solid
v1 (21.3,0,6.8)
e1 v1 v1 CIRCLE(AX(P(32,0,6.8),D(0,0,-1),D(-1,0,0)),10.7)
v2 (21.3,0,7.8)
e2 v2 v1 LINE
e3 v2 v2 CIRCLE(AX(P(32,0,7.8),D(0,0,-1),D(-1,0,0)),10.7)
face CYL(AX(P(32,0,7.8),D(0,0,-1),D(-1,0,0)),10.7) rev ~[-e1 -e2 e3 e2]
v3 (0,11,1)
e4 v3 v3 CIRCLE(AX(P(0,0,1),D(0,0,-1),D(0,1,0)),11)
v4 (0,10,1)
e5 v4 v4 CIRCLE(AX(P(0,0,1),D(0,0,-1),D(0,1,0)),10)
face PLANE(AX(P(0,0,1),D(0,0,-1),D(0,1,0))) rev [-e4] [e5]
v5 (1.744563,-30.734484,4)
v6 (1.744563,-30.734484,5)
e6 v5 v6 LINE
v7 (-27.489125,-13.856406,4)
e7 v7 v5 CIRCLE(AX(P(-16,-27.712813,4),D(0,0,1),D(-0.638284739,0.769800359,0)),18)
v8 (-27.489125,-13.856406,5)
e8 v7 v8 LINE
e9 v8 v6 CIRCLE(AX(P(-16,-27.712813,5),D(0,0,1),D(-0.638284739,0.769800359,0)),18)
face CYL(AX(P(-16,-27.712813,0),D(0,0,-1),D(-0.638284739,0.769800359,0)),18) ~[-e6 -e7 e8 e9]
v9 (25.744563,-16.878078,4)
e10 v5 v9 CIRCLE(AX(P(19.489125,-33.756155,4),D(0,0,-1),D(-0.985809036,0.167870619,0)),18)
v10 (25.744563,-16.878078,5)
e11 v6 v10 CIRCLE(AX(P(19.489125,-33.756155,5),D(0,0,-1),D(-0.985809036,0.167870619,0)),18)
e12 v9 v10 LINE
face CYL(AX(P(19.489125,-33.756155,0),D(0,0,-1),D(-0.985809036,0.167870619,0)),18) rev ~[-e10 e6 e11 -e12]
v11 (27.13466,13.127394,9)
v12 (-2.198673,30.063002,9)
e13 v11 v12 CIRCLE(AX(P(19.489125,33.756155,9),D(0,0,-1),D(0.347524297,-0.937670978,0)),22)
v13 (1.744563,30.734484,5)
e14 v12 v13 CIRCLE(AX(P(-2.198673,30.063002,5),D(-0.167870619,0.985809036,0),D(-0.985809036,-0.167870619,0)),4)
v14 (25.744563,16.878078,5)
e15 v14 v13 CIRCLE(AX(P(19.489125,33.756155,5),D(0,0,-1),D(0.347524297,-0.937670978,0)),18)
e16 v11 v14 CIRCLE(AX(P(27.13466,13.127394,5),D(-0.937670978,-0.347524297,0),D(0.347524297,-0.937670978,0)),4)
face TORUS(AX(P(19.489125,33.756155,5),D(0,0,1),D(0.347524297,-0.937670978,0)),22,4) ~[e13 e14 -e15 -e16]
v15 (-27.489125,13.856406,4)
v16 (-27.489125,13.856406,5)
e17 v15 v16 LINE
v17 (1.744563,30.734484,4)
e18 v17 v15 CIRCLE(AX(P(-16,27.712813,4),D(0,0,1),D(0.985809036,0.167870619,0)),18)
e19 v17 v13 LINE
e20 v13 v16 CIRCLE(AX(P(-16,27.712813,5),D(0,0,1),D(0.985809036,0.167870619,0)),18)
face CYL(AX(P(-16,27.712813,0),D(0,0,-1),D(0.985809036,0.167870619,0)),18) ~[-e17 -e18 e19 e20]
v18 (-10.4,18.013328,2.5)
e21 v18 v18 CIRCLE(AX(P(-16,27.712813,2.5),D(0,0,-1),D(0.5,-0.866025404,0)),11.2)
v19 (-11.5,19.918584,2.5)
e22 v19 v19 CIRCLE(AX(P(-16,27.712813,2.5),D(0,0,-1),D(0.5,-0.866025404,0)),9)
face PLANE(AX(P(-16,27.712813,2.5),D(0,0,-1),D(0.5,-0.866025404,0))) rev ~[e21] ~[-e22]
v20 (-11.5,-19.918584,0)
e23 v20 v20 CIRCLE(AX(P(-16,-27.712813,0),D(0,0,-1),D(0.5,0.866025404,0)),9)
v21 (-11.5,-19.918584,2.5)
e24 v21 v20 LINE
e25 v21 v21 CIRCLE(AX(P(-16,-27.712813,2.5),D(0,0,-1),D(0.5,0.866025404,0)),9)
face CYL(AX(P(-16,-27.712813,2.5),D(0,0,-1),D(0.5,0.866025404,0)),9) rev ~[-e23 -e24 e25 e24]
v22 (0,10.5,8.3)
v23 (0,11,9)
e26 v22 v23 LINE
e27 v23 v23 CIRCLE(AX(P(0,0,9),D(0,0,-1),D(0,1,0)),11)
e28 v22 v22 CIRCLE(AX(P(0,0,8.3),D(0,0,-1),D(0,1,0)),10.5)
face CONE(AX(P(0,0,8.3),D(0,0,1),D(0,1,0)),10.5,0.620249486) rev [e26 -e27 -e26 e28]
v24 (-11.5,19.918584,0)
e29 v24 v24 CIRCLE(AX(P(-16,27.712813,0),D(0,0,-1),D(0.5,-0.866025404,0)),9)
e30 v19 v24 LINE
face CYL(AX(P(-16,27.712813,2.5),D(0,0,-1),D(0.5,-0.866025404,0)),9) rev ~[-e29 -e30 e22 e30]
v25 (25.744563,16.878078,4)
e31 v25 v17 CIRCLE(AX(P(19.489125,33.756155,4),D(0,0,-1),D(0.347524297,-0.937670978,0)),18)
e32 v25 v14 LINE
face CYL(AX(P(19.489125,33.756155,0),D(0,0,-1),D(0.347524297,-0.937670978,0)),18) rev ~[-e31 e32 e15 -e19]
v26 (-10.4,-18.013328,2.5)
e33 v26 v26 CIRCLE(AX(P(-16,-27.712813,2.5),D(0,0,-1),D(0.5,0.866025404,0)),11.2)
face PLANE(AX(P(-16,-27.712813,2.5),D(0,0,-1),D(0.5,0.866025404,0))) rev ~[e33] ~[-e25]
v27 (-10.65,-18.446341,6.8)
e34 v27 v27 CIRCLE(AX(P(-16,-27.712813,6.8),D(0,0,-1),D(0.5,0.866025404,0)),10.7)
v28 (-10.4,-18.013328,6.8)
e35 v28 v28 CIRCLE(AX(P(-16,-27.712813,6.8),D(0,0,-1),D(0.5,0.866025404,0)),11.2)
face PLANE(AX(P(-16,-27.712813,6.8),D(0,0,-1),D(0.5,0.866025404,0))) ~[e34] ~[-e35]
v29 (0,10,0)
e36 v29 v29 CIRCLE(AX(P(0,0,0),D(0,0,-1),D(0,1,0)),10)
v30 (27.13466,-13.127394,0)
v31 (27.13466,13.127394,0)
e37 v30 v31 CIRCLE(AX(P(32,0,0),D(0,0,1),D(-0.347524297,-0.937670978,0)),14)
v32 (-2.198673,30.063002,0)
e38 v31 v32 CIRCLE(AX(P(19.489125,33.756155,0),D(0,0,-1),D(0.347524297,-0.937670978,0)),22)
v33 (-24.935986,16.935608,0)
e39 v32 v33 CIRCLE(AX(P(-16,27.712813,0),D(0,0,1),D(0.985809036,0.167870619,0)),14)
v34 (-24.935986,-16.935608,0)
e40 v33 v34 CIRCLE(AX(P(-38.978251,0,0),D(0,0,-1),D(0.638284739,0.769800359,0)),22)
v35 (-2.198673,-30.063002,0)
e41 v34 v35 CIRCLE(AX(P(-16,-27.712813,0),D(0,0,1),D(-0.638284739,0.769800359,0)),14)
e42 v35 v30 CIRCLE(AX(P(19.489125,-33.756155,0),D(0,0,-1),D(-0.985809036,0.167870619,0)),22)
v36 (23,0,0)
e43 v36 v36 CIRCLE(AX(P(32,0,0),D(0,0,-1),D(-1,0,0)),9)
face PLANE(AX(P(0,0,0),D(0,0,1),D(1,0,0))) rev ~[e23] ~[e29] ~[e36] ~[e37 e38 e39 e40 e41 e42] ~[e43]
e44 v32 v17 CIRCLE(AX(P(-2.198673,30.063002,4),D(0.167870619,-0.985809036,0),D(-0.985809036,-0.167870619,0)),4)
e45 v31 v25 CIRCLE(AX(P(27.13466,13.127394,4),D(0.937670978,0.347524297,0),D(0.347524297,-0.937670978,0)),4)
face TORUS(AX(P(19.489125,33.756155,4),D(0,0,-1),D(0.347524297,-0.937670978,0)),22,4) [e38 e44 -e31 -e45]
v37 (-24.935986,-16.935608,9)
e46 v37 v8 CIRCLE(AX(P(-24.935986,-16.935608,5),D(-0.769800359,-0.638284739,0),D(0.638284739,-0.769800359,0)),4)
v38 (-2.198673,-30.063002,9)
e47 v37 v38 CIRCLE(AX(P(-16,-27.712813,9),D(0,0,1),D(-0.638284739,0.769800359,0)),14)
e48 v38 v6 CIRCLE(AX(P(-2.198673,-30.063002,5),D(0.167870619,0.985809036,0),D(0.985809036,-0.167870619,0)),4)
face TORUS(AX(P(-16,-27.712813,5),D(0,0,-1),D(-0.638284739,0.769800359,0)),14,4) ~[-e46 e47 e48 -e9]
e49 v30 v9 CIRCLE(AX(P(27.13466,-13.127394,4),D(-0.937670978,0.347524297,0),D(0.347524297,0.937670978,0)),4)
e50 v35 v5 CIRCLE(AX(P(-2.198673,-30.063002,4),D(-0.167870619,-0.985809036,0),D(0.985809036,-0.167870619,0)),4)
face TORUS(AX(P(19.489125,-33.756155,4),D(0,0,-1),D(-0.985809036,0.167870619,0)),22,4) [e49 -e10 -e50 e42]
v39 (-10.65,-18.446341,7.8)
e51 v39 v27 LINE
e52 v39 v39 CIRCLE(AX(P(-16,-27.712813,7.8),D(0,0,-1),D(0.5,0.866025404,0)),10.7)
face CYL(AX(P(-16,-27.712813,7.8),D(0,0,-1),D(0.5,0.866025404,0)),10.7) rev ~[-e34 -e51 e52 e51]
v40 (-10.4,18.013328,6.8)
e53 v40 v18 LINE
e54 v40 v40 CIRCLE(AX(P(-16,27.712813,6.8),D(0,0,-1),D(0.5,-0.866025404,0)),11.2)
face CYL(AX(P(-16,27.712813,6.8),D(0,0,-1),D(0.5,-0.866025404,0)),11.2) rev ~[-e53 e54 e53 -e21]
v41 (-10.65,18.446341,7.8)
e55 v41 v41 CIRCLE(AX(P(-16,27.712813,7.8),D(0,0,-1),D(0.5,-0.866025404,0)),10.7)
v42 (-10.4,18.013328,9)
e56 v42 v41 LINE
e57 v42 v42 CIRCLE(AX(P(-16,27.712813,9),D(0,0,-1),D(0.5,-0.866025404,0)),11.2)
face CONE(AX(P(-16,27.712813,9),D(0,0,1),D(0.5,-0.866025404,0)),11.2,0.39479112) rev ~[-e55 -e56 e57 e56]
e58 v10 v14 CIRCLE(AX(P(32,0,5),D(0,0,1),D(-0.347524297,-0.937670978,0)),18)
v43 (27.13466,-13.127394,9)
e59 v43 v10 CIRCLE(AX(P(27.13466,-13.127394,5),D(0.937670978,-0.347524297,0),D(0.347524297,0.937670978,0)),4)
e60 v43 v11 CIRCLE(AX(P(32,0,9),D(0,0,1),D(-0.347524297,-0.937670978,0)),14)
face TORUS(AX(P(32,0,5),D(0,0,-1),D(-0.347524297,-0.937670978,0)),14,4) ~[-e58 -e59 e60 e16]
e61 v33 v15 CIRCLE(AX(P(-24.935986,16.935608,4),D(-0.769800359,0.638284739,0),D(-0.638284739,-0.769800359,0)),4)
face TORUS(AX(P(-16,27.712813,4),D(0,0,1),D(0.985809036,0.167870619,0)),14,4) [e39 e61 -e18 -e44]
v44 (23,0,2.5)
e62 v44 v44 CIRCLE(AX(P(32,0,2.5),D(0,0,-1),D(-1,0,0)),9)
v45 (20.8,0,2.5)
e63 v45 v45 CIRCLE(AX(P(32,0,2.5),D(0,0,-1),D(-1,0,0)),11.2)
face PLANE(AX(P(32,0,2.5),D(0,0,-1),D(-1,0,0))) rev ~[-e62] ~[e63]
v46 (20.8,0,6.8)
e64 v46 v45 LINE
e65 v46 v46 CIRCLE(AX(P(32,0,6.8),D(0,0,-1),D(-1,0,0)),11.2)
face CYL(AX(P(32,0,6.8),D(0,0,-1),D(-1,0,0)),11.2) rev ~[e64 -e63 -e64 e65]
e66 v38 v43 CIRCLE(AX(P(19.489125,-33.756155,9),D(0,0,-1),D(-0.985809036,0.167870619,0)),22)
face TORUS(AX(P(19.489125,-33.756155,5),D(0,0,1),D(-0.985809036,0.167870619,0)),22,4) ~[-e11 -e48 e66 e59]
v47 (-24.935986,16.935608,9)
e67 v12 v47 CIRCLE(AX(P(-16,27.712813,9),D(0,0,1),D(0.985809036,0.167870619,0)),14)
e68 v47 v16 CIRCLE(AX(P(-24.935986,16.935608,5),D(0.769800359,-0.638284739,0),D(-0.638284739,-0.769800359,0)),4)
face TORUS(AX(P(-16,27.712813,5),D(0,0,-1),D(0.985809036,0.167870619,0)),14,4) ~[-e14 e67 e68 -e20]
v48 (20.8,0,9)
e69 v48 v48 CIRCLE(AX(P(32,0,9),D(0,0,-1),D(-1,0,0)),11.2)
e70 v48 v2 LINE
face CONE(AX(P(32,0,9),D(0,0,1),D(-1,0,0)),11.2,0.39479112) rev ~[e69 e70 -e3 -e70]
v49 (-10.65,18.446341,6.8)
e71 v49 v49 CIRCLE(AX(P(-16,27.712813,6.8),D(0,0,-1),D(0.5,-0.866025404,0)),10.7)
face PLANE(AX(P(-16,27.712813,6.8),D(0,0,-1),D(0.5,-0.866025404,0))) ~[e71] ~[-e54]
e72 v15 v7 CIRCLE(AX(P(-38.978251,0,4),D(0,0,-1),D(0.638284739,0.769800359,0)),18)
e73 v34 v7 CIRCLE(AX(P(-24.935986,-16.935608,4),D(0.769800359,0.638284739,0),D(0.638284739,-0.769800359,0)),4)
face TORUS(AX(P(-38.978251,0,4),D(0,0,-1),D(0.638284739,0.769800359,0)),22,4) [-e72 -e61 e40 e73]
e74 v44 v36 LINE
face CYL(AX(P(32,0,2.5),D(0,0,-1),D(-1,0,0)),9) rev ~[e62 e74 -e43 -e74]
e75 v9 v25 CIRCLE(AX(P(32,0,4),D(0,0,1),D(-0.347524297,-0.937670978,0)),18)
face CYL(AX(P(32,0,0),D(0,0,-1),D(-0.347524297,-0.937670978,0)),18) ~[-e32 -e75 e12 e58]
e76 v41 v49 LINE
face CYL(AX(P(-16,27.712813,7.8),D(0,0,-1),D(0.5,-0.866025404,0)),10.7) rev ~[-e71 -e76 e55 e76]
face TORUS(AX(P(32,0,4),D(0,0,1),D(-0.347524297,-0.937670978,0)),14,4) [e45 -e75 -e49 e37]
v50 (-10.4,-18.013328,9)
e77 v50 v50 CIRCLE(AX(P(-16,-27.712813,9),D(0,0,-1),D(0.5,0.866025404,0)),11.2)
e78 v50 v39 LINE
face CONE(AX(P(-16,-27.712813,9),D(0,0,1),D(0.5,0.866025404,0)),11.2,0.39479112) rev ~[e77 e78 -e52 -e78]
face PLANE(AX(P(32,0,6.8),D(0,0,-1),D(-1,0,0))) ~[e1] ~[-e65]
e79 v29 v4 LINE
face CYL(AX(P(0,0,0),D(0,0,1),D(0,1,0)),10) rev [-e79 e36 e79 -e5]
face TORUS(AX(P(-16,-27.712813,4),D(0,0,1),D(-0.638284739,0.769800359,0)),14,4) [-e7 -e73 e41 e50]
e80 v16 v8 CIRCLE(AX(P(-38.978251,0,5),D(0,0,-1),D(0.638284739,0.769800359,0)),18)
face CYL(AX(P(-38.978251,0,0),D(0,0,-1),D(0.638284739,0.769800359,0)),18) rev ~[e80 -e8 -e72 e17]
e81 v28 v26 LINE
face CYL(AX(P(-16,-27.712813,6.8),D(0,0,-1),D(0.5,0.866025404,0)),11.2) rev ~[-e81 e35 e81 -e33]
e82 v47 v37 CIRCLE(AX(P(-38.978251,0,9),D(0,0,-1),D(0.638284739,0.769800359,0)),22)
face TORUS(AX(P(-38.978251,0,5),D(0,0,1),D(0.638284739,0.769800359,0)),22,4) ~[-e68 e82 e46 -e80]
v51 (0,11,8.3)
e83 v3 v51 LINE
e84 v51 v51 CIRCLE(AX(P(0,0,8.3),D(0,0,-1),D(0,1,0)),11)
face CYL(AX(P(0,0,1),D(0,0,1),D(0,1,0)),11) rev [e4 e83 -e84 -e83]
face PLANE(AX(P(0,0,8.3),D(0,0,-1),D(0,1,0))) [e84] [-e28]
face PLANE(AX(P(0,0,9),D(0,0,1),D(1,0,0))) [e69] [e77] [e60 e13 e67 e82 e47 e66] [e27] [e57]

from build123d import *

# Parameters (mm, degrees)
F1_DEPTH        = 9
F5_COPIES_COUNT = 3
F6_R            = 4


# Not quite as in the source:
# - a pattern or mirror of a feature is missing from the dataset's text; its kind, count and spacing are read off the source's solid


with BuildPart() as f1:
    # F0 (on Top) → F1 (new body)
    with BuildSketch(Plane.XY):
        with BuildLine():
            ThreePointArc((1.7445626465, -30.7344840619), (10.4891252931, -18.1676979346), (25.7445626465, -16.8780776013))
            ThreePointArc((25.7445626465, -16.8780776013), (50, 0), (25.7445626465, 16.8780776013))
            ThreePointArc((25.7445626465, 16.8780776013), (10.4891252931, 18.1676979346), (1.7445626465, 30.7344840619))
            ThreePointArc((1.7445626465, 30.7344840619), (-25, 43.3012701892), (-27.4891252931, 13.8564064606))
            ThreePointArc((-27.4891252931, 13.8564064606), (-20.9782505862, 0), (-27.4891252931, -13.8564064606))
            ThreePointArc((-27.4891252931, -13.8564064606), (-25, -43.3012701892), (1.7445626465, -30.7344840619))
        make_face()
    extrude(amount=F1_DEPTH)

    # F2 (on Right) → F3 (revolve, cut)
    with BuildSketch(Plane.YZ):
        Polygon((0, 9), (0, 0), (10, 0), (10, 1), (11, 1), (11, 8.3), (10.5, 8.3), (11, 9), align=None)
    revolve(axis=Axis((0, 0, 3.7751235068), (0, 0, -1)), mode=Mode.SUBTRACT)

    # F4 (on Front) → F5 (revolve, cut)
    with BuildSketch(Plane.XZ):
        Polygon((23, 0), (32, 0), (32, 9), (20.8, 9), (21.3, 7.8), (21.3, 6.8), (20.8, 6.8), (20.8, 2.5), (23, 2.5), align=None)
    f5 = revolve(axis=Axis((32, 0, 6.29213918), (0, 0, -1)), mode=Mode.SUBTRACT)

    # F5_copies: F5 ×3 about axis
    f5_copies_axis = Axis((0, 0, 0), (0, 0, 1))
    for i in range(1, F5_COPIES_COUNT):
        add(f5.rotate(f5_copies_axis, i * 360 / F5_COPIES_COUNT), mode=Mode.SUBTRACT)

    # F6
    f6_edges = [f1.edges().sort_by_distance(p)[0] for p in [
        (10.489125, 18.167698, 9),
        (10.489125, 18.167698, 0),
        (10.489125, -18.167698, 0),
        (10.489125, -18.167698, 9),
        (-25, -43.30127, 0),
        (-25, -43.30127, 9),
        (50, 0, 0),
        (50, 0, 9),
        (-20.978251, 0, 0),
        (-25, 43.30127, 0),
        (-20.978251, 0, 9),
        (-25, 43.30127, 9),
    ]]
    fillet(f6_edges, radius=F6_R)


solid = f1.part
